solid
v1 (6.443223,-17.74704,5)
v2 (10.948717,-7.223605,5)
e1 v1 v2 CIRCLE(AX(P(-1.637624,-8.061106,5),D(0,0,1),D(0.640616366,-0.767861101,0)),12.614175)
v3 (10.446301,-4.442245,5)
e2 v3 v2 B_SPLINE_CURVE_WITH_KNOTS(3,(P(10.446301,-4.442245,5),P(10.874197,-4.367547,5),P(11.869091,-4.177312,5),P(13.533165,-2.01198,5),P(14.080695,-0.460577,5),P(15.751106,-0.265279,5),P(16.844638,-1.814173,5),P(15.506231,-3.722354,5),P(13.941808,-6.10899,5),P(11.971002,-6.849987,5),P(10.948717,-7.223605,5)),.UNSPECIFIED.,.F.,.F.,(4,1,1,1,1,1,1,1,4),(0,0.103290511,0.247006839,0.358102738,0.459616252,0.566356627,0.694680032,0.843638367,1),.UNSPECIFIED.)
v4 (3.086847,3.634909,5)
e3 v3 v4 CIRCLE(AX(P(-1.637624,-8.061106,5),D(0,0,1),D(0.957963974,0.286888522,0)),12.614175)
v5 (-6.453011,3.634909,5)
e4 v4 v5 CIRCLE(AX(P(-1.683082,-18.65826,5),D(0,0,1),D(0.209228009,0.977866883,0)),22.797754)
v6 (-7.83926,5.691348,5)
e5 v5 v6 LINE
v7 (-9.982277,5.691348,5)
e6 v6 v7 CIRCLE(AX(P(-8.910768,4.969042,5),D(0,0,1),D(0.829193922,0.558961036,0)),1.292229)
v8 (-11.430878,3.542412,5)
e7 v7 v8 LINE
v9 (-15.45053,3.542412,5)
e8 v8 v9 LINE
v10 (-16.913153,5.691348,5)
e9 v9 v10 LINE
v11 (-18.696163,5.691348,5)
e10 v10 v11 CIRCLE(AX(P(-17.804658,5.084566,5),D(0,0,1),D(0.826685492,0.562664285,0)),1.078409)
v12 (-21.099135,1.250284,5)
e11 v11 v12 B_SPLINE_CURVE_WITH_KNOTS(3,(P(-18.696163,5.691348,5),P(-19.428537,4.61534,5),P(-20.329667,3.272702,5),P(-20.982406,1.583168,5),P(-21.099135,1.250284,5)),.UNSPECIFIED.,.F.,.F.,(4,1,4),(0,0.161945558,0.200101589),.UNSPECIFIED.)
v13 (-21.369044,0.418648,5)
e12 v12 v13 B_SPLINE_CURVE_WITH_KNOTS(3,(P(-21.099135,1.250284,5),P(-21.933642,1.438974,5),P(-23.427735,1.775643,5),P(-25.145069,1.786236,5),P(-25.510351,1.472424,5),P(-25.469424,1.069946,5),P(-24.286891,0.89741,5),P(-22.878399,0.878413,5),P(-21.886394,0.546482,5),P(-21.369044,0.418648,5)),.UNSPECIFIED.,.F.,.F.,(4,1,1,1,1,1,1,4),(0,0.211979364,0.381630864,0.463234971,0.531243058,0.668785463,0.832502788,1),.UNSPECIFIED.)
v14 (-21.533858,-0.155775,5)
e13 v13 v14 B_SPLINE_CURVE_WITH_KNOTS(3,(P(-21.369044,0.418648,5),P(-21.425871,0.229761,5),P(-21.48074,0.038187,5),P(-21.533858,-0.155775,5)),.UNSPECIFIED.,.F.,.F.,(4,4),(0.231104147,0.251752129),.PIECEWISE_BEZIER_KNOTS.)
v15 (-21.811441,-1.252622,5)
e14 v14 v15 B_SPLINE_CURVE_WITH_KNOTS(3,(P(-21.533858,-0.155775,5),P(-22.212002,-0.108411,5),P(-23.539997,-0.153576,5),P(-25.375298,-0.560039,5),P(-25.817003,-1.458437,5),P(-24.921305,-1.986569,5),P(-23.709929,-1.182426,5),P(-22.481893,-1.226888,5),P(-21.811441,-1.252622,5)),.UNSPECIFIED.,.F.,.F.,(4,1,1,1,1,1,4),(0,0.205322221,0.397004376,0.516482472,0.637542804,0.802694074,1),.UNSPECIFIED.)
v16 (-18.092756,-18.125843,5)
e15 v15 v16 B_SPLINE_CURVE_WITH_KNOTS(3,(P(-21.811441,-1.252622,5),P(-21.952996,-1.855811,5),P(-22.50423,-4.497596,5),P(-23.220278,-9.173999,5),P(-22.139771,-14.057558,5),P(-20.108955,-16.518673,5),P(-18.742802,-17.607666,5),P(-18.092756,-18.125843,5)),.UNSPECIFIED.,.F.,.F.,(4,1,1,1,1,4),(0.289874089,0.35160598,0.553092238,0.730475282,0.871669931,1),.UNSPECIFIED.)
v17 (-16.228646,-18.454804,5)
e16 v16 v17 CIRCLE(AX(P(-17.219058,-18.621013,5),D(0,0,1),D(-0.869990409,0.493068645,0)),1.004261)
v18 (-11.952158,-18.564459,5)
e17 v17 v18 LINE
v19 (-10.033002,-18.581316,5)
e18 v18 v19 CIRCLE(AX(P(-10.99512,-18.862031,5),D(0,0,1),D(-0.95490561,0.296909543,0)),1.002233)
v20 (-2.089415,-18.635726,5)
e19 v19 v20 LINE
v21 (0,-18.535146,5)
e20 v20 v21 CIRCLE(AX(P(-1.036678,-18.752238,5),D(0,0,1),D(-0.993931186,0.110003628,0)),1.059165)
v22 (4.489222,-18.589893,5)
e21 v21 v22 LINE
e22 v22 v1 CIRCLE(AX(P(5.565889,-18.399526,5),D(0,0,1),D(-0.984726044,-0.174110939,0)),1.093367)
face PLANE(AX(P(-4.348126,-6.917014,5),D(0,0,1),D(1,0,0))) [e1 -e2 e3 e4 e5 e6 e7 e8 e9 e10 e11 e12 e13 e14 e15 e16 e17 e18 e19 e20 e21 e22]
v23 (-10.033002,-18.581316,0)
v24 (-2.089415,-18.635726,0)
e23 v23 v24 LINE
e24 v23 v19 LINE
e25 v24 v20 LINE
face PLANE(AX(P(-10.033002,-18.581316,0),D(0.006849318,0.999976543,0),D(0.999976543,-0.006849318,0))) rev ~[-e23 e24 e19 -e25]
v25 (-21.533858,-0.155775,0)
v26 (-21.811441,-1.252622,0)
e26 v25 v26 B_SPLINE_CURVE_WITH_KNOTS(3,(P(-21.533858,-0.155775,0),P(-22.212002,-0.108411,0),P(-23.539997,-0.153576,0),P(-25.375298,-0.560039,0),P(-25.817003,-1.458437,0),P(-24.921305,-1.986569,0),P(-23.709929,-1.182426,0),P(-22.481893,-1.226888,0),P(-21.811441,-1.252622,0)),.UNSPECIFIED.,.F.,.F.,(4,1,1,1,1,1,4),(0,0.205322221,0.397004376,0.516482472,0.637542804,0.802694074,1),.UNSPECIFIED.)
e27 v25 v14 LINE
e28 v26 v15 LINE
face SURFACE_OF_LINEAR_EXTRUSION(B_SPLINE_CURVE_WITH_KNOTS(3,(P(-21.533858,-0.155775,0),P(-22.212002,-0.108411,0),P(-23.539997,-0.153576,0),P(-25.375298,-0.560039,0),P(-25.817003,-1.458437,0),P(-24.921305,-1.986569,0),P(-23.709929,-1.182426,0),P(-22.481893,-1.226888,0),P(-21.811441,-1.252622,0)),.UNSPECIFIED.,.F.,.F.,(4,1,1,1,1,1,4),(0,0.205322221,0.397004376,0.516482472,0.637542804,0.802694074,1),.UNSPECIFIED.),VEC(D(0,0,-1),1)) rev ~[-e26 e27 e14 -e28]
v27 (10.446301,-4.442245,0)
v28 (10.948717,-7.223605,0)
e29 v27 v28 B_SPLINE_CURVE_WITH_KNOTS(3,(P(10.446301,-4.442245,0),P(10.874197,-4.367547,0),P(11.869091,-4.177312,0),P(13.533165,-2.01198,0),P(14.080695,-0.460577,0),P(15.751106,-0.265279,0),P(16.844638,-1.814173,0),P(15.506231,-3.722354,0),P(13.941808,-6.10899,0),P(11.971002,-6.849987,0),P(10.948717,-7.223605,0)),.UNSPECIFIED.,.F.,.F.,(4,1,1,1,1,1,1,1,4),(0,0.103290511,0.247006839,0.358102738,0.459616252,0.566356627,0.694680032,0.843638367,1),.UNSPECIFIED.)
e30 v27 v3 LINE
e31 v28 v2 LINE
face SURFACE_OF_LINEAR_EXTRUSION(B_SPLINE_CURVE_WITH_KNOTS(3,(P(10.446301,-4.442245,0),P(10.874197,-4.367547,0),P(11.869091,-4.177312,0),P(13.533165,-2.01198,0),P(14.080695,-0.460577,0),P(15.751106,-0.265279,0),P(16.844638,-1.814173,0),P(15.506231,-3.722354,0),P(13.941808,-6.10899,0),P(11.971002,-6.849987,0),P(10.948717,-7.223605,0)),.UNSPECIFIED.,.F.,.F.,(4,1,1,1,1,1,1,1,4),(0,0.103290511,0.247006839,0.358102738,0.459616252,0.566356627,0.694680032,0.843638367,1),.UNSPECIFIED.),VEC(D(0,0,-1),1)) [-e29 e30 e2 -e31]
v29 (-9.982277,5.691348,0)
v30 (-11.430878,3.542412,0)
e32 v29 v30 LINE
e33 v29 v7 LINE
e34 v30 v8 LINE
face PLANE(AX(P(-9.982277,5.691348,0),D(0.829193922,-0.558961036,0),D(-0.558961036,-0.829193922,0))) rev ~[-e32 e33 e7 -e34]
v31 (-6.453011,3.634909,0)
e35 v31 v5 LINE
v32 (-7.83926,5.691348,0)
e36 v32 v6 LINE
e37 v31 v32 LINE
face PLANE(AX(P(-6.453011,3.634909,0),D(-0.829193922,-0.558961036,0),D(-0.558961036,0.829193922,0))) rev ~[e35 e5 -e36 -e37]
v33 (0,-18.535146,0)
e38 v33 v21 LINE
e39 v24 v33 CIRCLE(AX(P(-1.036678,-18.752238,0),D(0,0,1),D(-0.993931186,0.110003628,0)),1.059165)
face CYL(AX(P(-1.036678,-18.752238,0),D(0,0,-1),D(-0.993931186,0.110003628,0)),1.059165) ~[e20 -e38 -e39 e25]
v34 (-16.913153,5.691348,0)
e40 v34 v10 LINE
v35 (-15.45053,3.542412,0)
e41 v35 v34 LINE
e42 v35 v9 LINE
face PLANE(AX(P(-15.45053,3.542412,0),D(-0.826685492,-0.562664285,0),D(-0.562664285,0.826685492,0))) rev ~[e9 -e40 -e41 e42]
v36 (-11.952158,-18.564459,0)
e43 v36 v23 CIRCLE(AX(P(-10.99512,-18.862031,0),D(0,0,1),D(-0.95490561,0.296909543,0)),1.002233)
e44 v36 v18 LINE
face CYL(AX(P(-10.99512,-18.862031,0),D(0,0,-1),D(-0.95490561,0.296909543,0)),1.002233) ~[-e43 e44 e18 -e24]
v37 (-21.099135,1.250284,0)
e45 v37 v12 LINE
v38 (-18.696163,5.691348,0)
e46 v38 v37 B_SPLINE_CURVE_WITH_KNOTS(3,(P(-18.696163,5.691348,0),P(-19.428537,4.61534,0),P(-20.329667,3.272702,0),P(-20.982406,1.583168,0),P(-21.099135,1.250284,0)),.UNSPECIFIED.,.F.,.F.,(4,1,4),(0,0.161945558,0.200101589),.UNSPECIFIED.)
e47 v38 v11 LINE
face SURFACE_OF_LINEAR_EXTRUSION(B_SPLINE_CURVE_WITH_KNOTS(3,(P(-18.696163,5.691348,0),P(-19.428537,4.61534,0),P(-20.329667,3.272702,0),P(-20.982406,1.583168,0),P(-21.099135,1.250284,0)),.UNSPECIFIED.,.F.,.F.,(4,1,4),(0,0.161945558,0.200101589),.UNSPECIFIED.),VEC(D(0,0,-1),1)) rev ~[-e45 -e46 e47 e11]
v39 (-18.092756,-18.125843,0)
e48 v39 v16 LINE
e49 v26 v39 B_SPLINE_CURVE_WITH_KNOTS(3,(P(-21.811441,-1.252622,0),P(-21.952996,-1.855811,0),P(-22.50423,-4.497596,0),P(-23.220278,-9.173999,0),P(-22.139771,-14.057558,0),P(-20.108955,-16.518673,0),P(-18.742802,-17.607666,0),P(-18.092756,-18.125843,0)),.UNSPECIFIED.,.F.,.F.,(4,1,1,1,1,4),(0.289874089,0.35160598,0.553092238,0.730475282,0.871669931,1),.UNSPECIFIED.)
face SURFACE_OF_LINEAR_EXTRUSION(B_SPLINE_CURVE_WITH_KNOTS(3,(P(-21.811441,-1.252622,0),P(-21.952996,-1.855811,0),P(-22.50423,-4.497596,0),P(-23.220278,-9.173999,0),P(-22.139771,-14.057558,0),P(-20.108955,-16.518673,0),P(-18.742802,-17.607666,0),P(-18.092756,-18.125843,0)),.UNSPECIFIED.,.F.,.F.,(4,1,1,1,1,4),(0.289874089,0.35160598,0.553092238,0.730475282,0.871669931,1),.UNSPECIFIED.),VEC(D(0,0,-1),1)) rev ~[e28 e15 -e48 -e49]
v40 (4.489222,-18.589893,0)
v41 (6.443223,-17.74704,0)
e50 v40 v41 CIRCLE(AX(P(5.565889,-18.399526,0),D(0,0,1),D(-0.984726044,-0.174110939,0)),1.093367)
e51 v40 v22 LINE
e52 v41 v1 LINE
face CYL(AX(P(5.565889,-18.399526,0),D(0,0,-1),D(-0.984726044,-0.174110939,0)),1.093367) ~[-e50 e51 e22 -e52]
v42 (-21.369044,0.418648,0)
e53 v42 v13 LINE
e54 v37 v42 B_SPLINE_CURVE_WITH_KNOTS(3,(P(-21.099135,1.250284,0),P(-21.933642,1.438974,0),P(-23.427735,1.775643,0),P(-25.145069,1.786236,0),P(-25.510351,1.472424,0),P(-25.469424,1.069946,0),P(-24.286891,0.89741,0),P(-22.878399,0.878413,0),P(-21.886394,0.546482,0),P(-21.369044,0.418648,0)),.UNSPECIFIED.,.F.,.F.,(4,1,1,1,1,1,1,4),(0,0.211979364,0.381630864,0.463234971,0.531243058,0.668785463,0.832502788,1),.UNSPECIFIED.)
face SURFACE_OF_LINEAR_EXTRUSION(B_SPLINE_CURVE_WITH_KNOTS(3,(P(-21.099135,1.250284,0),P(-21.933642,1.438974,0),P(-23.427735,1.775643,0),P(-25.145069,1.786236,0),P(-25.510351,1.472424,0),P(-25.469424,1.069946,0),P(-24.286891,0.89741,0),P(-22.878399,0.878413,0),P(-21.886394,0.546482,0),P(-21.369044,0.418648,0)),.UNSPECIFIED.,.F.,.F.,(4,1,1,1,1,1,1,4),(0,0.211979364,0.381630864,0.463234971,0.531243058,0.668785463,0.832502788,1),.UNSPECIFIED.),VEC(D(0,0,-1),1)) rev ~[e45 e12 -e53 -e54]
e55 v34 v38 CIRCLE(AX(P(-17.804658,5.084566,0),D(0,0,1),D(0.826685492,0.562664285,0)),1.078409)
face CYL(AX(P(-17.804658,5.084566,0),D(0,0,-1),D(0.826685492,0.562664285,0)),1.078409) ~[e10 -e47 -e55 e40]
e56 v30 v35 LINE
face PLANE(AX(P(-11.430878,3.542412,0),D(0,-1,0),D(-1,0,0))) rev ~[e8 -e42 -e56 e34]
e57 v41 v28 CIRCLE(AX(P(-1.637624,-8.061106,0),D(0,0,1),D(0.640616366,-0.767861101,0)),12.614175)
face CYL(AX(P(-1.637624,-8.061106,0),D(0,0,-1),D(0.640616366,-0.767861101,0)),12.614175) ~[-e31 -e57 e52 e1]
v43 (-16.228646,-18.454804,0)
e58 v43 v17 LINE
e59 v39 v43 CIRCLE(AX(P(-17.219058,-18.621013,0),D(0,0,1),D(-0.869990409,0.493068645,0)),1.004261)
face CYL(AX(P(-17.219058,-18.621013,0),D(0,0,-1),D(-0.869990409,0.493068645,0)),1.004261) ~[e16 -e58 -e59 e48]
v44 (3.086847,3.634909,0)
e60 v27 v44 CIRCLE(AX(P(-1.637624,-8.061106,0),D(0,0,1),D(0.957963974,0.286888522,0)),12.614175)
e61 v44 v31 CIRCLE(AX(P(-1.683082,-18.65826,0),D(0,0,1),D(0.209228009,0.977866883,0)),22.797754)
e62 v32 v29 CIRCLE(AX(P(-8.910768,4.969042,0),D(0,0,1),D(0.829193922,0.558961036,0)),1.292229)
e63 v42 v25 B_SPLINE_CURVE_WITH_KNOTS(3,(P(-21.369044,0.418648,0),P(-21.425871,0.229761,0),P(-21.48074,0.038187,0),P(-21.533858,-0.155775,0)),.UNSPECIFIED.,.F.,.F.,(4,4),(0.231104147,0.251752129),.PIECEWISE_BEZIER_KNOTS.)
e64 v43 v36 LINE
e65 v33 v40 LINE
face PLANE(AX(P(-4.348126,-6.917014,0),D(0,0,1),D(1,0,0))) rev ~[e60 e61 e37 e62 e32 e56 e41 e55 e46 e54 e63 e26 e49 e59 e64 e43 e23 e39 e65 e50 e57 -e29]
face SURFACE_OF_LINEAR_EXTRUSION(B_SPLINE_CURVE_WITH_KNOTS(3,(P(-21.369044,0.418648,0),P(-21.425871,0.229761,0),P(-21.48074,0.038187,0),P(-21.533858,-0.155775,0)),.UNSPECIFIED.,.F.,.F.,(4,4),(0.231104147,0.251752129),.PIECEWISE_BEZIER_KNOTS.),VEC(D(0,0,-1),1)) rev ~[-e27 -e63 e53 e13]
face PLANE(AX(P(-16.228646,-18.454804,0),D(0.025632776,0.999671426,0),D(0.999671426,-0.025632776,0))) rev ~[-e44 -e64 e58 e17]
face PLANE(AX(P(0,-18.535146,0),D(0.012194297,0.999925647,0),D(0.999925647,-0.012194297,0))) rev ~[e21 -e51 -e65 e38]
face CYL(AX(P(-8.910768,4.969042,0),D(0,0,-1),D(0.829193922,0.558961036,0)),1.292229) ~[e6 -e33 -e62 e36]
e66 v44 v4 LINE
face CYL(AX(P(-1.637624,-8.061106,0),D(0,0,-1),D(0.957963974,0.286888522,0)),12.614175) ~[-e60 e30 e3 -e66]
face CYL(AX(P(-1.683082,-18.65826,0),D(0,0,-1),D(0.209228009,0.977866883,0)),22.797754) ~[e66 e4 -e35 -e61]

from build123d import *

# Parameters (mm, degrees)
F1_DEPTH = 5


with BuildPart() as f1:
    # F0 (on Top) → F1 (new body)
    with BuildSketch(Plane.XY):
        with BuildLine():
            add(Edge.make_bspline(
                [(-21.8114407323, -1.2526222444), (-21.9529955358, -1.8558107382), (-22.5042300878, -4.4975959061), (-23.2202782456, -9.1739987206), (-22.139771433, -14.0575578844), (-20.1089547521, -16.5186726713), (-18.7428019831, -17.6076660665), (-18.0927556227, -18.1258433528)],
                knots=[0.2898740891, 0.2898740891, 0.2898740891, 0.2898740891, 0.3516059803, 0.5530922378, 0.7304752816, 0.8716699309, 1, 1, 1, 1], degree=3))
            ThreePointArc((-18.0927556227, -18.1258433528), (-17.3935839447, -19.6099932849), (-16.2286459528, -18.4548043257))
            Line((-16.2286459528, -18.4548043257), (-11.9521580111, -18.5644586109))
            ThreePointArc((-11.9521580111, -18.5644586109), (-11.0039228875, -19.8642260207), (-10.0330017809, -18.5813162912))
            Line((-10.0330017809, -18.5813162912), (-2.0894149434, -18.6357257221))
            ThreePointArc((-2.0894149434, -18.6357257221), (-0.9857511229, -19.81017747), (0, -18.5351459173))
            Line((0, -18.5351459173), (4.4892215974, -18.5898928889))
            ThreePointArc((4.4892215974, -18.5898928889), (5.9989401794, -19.4034770666), (6.4432226901, -17.7470403905))
            ThreePointArc((6.4432226901, -17.7470403905), (9.9584459704, -13.0258381827), (10.9487174865, -7.2236052228))
            add(Edge.make_bspline(
                [(10.4463008096, -4.4422445204), (10.8741972144, -4.3675474393), (11.8690913168, -4.1773115011), (13.5331652433, -2.0119802219), (14.0806952433, -0.4605773182), (15.7511056613, -0.2652793882), (16.8446379611, -1.8141733756), (15.5062311575, -3.7223544079), (13.9418083475, -6.1089896659), (11.9710015695, -6.8499874791), (10.9487174865, -7.2236052228)],
                knots=[0, 0, 0, 0, 0.1032905111, 0.2470068386, 0.3581027377, 0.4596162524, 0.5663566268, 0.6946800325, 0.8436383674, 1, 1, 1, 1], degree=3))
            ThreePointArc((10.4463008096, -4.4422445204), (7.6865725324, 0.4345842042), (3.0868465244, 3.6349090665))
            ThreePointArc((3.0868465244, 3.6349090665), (-1.6830821707, 4.1394944322), (-6.4530108658, 3.6349090665))
            Line((-6.4530108658, 3.6349090665), (-7.8392599399, 5.6913481227))
            ThreePointArc((-7.8392599399, 5.6913481227), (-8.9107684121, 6.2612714829), (-9.9822768844, 5.6913481227))
            Line((-9.9822768844, 5.6913481227), (-11.4308783984, 3.5424119856))
            Line((-11.4308783984, 3.5424119856), (-15.4505299922, 3.5424119856))
            Line((-15.4505299922, 3.5424119856), (-16.9131534756, 5.6913481227))
            ThreePointArc((-16.9131534756, 5.6913481227), (-17.8046582966, 6.1629747599), (-18.6961631175, 5.6913481227))
            add(Edge.make_bspline(
                [(-18.6961631175, 5.6913481227), (-19.4285369113, 4.6153397899), (-20.3296673033, 3.2727021769), (-20.9824057089, 1.5831681063), (-21.0991354999, 1.2502842354)],
                knots=[0, 0, 0, 0, 0.1619455579, 0.2001015887, 0.2001015887, 0.2001015887, 0.2001015887], degree=3))
            add(Edge.make_bspline(
                [(-21.0991354999, 1.2502842354), (-21.1939808519, 0.9798092551), (-21.2837186334, 0.7022584), (-21.3690435276, 0.4186483175)],
                knots=[0.2001015887, 0.2001015887, 0.2001015887, 0.2001015887, 0.2311041471, 0.2311041471, 0.2311041471, 0.2311041471], degree=3))
            add(Edge.make_bspline(
                [(-21.3690435276, 0.4186483175), (-21.4258706707, 0.2297614645), (-21.4807403986, 0.0381869326), (-21.5338579347, -0.15577494)],
                knots=[0.2311041471, 0.2311041471, 0.2311041471, 0.2311041471, 0.2517521285, 0.2517521285, 0.2517521285, 0.2517521285], degree=3))
            add(Edge.make_bspline(
                [(-21.5338579347, -0.15577494), (-21.6319277937, -0.5138829189), (-21.7240248677, -0.8801287474), (-21.8114407323, -1.2526222444)],
                knots=[0.2517521285, 0.2517521285, 0.2517521285, 0.2517521285, 0.2898740891, 0.2898740891, 0.2898740891, 0.2898740891], degree=3))
        make_face()
        with BuildLine():
            add(Edge.make_bspline(
                [(-21.5338579347, -0.15577494), (-22.2120015737, -0.1084108073), (-23.5399972583, -0.1535762915), (-25.3752977452, -0.5600385686), (-25.8170028342, -1.4584373864), (-24.9213051104, -1.9865694968), (-23.7099288456, -1.1824261792), (-22.4818931077, -1.2268881647), (-21.8114407323, -1.2526222444)],
                knots=[0, 0, 0, 0, 0.2053222205, 0.3970043755, 0.5164824715, 0.6375428035, 0.802694074, 1, 1, 1, 1], degree=3))
            add(Edge.make_bspline(
                [(-21.5338579347, -0.15577494), (-21.6319277937, -0.5138829189), (-21.7240248677, -0.8801287474), (-21.8114407323, -1.2526222444)],
                knots=[0.2517521285, 0.2517521285, 0.2517521285, 0.2517521285, 0.2898740891, 0.2898740891, 0.2898740891, 0.2898740891], degree=3))
        make_face()
        with BuildLine():
            add(Edge.make_bspline(
                [(-21.0991354999, 1.2502842354), (-21.9336416547, 1.4389735678), (-23.4277348773, 1.7756429479), (-25.1450687292, 1.7862361389), (-25.5103505424, 1.4724239125), (-25.4694238607, 1.0699461681), (-24.2868908085, 0.8974097249), (-22.8783994531, 0.8784133331), (-21.8863935379, 0.5464820129), (-21.3690435276, 0.4186483175)],
                knots=[0, 0, 0, 0, 0.2119793639, 0.3816308644, 0.4632349714, 0.5312430576, 0.6687854633, 0.8325027876, 1, 1, 1, 1], degree=3))
            add(Edge.make_bspline(
                [(-21.0991354999, 1.2502842354), (-21.1939808519, 0.9798092551), (-21.2837186334, 0.7022584), (-21.3690435276, 0.4186483175)],
                knots=[0.2001015887, 0.2001015887, 0.2001015887, 0.2001015887, 0.2311041471, 0.2311041471, 0.2311041471, 0.2311041471], degree=3))
        make_face()
    extrude(amount=F1_DEPTH)


solid = f1.part
